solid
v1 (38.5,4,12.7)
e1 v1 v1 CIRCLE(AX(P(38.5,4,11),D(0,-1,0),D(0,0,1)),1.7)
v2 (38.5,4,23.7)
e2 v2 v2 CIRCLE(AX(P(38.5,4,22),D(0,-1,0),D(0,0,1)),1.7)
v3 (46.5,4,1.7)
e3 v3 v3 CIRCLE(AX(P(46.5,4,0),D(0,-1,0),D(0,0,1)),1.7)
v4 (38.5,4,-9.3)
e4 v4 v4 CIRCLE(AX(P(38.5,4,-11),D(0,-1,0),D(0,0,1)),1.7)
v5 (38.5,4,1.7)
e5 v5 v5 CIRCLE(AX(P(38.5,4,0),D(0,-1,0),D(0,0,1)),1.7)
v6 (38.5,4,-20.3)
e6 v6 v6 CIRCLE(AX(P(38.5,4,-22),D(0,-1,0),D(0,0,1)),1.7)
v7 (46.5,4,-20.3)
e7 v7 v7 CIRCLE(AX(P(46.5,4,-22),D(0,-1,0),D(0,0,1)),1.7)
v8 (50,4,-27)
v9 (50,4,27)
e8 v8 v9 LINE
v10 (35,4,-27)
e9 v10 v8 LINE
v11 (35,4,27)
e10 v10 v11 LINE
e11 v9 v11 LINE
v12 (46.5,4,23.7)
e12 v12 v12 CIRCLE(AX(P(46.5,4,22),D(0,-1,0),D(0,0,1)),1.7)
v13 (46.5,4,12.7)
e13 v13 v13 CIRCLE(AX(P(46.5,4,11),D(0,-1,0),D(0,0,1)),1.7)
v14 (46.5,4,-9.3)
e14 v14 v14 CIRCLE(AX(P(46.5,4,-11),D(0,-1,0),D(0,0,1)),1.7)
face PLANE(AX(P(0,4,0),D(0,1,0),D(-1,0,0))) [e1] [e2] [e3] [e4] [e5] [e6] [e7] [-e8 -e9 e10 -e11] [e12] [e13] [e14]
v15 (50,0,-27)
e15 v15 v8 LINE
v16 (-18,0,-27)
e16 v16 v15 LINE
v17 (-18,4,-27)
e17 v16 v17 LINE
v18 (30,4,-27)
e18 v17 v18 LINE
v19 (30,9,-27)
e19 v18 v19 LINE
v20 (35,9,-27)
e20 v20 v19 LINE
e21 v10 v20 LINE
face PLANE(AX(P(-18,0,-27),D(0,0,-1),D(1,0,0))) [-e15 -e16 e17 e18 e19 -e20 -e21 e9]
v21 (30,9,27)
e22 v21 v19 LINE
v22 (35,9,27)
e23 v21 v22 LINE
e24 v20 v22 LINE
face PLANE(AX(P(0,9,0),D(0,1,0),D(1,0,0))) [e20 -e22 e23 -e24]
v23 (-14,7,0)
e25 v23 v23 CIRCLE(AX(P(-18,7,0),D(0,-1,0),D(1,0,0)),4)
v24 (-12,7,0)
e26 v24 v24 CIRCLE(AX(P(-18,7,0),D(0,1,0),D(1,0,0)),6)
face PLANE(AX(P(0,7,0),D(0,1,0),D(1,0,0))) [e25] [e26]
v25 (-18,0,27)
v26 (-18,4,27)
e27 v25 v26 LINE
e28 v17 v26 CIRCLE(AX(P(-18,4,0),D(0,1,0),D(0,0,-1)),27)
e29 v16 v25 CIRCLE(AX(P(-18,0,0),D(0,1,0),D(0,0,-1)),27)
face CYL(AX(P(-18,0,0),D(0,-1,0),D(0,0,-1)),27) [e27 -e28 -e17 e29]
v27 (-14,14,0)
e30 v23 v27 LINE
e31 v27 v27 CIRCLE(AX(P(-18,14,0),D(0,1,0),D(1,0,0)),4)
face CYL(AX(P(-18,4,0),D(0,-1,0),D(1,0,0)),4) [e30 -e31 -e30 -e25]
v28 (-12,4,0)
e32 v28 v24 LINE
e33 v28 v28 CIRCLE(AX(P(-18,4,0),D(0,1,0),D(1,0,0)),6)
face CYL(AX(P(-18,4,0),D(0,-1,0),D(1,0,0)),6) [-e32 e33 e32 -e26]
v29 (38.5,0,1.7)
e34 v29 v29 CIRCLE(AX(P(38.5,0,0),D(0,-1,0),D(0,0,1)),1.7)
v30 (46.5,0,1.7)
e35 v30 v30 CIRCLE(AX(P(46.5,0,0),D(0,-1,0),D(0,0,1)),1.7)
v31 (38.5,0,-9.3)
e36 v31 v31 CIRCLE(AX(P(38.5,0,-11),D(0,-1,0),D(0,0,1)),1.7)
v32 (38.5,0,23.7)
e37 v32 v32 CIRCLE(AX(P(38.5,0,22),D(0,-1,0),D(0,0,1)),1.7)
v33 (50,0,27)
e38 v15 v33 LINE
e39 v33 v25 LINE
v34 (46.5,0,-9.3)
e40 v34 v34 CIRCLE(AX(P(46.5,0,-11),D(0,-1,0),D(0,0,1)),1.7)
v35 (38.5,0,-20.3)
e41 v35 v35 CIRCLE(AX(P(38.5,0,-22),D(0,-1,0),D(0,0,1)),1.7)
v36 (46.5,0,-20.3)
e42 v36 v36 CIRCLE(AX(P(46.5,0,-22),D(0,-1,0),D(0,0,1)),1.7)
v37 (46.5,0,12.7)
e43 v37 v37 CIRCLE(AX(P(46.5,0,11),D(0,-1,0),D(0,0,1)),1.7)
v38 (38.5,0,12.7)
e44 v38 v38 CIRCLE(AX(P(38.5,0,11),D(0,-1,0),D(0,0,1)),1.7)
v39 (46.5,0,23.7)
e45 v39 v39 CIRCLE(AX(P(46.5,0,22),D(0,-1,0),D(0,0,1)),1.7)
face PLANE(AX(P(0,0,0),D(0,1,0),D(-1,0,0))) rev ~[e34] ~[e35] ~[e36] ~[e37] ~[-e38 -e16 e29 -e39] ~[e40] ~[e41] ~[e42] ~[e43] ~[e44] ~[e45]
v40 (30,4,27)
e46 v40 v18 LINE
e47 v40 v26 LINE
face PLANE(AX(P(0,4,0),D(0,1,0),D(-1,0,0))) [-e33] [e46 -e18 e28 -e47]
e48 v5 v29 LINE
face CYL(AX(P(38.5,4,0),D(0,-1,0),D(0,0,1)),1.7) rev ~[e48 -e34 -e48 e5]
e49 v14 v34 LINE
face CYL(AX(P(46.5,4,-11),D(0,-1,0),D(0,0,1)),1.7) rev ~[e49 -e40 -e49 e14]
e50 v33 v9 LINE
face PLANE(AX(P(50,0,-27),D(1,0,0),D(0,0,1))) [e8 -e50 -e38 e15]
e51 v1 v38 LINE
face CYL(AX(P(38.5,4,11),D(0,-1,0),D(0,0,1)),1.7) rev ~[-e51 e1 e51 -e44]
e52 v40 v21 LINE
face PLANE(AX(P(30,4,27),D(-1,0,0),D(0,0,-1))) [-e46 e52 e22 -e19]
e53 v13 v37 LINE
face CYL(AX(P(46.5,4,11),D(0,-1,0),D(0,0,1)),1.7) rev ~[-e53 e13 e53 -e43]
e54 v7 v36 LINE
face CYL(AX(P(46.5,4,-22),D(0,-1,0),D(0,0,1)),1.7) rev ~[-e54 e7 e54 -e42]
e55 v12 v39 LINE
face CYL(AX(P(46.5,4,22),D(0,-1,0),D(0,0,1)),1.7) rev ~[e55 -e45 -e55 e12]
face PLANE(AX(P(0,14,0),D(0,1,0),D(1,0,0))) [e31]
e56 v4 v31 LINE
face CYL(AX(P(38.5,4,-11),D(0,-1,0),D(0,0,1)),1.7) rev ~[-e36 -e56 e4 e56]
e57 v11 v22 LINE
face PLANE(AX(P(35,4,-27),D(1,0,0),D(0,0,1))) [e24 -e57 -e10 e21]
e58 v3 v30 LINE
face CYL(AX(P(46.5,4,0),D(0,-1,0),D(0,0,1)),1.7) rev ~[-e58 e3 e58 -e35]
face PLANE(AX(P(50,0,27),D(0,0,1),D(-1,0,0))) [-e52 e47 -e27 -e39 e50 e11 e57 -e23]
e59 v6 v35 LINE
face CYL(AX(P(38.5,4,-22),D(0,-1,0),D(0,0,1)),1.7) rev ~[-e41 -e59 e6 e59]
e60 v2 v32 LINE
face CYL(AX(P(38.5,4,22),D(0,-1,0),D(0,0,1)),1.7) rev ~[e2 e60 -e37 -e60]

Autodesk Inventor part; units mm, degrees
ref_plane "YZ Plane" through (0, 0, 0) normal (1, 0, 0) x (0, 1, 0)
ref_plane "XZ Plane" through (0, 0, 0) normal (0, 1, 0) x (-1, 0, 0)
ref_plane "XY Plane" through (0, 0, 0) normal (0, 0, 1) x (1, 0, 0)
sketch "Skizze1" plane through (0, 0, 0) normal (0, 1, 0) x (-1, 0, 0)
  line L0 (-50, 27) -> (50, 27)
  line L1 (50, 27) -> (50, -27) construction
  line L2 (50, -27) -> (-50, -27)
  line L3 (-50, -27) -> (-50, 27)
  line L4 (-50, 27) -> (50, -27) construction
  line L5 (50, 27) -> (-50, -27) construction
  line L6 (0, 0) -> (66.4326, 0) construction
  arc A0 (18, -27) -> (18, 27) centre (18, 0) ccw
  dimension "d0" = 54
  dimension "d1" = 100
  dimension "d12" = 68
  dimension "d13" = 90
extrude "Extrusion1" add sketch "Skizze1" along normal blind 4
sketch "Skizze3" plane through (0, 4, 0) normal (0, 1, 0) x (1, 0, 0)
  circle A0 centre (-18, 0) radius 6
  line L0 (0, 0) -> (-17.1865, 0) construction
  line L1 (50, -27) -> (50, 27) construction
  line L2 (-18, -27) -> (50, -27) projected
  line L3 (50, -27) -> (50, 27) construction
  line L4 (50, 27) -> (-18, 27) construction
  line L5 (-18, -27) -> (50, -27) construction
  line L6 (50, 27) -> (-18, 27) construction
  arc A1 (-18, 27) -> (-18, -27) centre (-18, 0) ccw projected
  point P0 (-50, -27)
  point P1 (-50, 27)
  dimension "d8" = 12
  dimension "d9" = 68
extrude "Extrusion3" [suppressed]
sketch "Skizze5" plane through (0, 4, 0) normal (0, 1, 0) x (1, 0, 0)
  line L0 (-18, -27) -> (50, -27) projected
  line L1 (50, -27) -> (50, 27) projected
  line L2 (50, 27) -> (-18, 27) projected
  arc A0 (-18, 27) -> (-18, -27) centre (-18, 0) ccw projected
  line L3 (35, -27) -> (30, -27)
  line L4 (30, -27) -> (30, 27)
  line L5 (30, 27) -> (35, 27)
  line L6 (35, 27) -> (35, -27)
  point P0 (0, 0)
  dimension "d14" = 15
  dimension "d15" = 5
extrude "Extrusion4" add sketch "Skizze5" along normal blind 5 contours L4 L2 L6 L0
sketch "Skizze6" plane through (0, 4, 0) normal (0, 1, 0) x (1, 0, 0)
  line L0 (35, 27) -> (35, -27) projected
  line L1 (35, -27) -> (50, -27) projected
  line L2 (50, -27) -> (50, 27) projected
  line L3 (50, 27) -> (35, 27) projected
  line L4 (0, 0) -> (67.4565, 0) construction
  point P0 (46.5, 0)
  dimension "d18" = 3.5
hole "Bohrung1" at (46.5, 4, 0) direction (0, -1, 0) diameter 3.4 end through all clearance for "Inbusschraube ISO 4762" size "M3" standard "ISO"
pattern_linear "Rechteckige Anordnung1" count 5 spacing 11 along (0, 0, -1) count 2 spacing 8 along (-1, 0, 0) of "Bohrung1" first direction both ways yes
sketch "Skizze7" plane through (0, 0, 0) normal (0, -1, 0) x (1, 0, 0)
  circle A0 centre (-18, 0) radius 6 projected
  circle A1 centre (-18, 0) radius 10 construction
  line L0 (-18, -12.7159) -> (-18, 15.8855)
  line L1 (-33.0539, 0) -> (-6.7164, 0)
  point P0 (0, 0)
  point P1 (-18, -10)
  point P2 (-28, 0)
  point P3 (-18, 10)
  point P4 (-8, 0)
  dimension "d32" = 20
hole "Bohrung2" [suppressed]
sketch "Skizze8" plane through (0, 4, 0) normal (0, 1, 0) x (1, 0, 0)
  arc A0 (-18, 27) -> (-18, -27) centre (-18, 0) ccw projected
  circle A1 centre (-18, 0) radius 6
  circle A2 centre (-18, 0) radius 4
  point P0 (0, 0)
  dimension "d40" = 12
  dimension "d43" = 8
extrude "Extrusion5" add sketch "Skizze8" along normal blind 3 contours A1 | A2
extrude "Extrusion6" add sketch "Skizze8" along normal blind 10 contours A2
properties part number "dynamixel_pro_frame_part2" material "Aluminium 6061"
